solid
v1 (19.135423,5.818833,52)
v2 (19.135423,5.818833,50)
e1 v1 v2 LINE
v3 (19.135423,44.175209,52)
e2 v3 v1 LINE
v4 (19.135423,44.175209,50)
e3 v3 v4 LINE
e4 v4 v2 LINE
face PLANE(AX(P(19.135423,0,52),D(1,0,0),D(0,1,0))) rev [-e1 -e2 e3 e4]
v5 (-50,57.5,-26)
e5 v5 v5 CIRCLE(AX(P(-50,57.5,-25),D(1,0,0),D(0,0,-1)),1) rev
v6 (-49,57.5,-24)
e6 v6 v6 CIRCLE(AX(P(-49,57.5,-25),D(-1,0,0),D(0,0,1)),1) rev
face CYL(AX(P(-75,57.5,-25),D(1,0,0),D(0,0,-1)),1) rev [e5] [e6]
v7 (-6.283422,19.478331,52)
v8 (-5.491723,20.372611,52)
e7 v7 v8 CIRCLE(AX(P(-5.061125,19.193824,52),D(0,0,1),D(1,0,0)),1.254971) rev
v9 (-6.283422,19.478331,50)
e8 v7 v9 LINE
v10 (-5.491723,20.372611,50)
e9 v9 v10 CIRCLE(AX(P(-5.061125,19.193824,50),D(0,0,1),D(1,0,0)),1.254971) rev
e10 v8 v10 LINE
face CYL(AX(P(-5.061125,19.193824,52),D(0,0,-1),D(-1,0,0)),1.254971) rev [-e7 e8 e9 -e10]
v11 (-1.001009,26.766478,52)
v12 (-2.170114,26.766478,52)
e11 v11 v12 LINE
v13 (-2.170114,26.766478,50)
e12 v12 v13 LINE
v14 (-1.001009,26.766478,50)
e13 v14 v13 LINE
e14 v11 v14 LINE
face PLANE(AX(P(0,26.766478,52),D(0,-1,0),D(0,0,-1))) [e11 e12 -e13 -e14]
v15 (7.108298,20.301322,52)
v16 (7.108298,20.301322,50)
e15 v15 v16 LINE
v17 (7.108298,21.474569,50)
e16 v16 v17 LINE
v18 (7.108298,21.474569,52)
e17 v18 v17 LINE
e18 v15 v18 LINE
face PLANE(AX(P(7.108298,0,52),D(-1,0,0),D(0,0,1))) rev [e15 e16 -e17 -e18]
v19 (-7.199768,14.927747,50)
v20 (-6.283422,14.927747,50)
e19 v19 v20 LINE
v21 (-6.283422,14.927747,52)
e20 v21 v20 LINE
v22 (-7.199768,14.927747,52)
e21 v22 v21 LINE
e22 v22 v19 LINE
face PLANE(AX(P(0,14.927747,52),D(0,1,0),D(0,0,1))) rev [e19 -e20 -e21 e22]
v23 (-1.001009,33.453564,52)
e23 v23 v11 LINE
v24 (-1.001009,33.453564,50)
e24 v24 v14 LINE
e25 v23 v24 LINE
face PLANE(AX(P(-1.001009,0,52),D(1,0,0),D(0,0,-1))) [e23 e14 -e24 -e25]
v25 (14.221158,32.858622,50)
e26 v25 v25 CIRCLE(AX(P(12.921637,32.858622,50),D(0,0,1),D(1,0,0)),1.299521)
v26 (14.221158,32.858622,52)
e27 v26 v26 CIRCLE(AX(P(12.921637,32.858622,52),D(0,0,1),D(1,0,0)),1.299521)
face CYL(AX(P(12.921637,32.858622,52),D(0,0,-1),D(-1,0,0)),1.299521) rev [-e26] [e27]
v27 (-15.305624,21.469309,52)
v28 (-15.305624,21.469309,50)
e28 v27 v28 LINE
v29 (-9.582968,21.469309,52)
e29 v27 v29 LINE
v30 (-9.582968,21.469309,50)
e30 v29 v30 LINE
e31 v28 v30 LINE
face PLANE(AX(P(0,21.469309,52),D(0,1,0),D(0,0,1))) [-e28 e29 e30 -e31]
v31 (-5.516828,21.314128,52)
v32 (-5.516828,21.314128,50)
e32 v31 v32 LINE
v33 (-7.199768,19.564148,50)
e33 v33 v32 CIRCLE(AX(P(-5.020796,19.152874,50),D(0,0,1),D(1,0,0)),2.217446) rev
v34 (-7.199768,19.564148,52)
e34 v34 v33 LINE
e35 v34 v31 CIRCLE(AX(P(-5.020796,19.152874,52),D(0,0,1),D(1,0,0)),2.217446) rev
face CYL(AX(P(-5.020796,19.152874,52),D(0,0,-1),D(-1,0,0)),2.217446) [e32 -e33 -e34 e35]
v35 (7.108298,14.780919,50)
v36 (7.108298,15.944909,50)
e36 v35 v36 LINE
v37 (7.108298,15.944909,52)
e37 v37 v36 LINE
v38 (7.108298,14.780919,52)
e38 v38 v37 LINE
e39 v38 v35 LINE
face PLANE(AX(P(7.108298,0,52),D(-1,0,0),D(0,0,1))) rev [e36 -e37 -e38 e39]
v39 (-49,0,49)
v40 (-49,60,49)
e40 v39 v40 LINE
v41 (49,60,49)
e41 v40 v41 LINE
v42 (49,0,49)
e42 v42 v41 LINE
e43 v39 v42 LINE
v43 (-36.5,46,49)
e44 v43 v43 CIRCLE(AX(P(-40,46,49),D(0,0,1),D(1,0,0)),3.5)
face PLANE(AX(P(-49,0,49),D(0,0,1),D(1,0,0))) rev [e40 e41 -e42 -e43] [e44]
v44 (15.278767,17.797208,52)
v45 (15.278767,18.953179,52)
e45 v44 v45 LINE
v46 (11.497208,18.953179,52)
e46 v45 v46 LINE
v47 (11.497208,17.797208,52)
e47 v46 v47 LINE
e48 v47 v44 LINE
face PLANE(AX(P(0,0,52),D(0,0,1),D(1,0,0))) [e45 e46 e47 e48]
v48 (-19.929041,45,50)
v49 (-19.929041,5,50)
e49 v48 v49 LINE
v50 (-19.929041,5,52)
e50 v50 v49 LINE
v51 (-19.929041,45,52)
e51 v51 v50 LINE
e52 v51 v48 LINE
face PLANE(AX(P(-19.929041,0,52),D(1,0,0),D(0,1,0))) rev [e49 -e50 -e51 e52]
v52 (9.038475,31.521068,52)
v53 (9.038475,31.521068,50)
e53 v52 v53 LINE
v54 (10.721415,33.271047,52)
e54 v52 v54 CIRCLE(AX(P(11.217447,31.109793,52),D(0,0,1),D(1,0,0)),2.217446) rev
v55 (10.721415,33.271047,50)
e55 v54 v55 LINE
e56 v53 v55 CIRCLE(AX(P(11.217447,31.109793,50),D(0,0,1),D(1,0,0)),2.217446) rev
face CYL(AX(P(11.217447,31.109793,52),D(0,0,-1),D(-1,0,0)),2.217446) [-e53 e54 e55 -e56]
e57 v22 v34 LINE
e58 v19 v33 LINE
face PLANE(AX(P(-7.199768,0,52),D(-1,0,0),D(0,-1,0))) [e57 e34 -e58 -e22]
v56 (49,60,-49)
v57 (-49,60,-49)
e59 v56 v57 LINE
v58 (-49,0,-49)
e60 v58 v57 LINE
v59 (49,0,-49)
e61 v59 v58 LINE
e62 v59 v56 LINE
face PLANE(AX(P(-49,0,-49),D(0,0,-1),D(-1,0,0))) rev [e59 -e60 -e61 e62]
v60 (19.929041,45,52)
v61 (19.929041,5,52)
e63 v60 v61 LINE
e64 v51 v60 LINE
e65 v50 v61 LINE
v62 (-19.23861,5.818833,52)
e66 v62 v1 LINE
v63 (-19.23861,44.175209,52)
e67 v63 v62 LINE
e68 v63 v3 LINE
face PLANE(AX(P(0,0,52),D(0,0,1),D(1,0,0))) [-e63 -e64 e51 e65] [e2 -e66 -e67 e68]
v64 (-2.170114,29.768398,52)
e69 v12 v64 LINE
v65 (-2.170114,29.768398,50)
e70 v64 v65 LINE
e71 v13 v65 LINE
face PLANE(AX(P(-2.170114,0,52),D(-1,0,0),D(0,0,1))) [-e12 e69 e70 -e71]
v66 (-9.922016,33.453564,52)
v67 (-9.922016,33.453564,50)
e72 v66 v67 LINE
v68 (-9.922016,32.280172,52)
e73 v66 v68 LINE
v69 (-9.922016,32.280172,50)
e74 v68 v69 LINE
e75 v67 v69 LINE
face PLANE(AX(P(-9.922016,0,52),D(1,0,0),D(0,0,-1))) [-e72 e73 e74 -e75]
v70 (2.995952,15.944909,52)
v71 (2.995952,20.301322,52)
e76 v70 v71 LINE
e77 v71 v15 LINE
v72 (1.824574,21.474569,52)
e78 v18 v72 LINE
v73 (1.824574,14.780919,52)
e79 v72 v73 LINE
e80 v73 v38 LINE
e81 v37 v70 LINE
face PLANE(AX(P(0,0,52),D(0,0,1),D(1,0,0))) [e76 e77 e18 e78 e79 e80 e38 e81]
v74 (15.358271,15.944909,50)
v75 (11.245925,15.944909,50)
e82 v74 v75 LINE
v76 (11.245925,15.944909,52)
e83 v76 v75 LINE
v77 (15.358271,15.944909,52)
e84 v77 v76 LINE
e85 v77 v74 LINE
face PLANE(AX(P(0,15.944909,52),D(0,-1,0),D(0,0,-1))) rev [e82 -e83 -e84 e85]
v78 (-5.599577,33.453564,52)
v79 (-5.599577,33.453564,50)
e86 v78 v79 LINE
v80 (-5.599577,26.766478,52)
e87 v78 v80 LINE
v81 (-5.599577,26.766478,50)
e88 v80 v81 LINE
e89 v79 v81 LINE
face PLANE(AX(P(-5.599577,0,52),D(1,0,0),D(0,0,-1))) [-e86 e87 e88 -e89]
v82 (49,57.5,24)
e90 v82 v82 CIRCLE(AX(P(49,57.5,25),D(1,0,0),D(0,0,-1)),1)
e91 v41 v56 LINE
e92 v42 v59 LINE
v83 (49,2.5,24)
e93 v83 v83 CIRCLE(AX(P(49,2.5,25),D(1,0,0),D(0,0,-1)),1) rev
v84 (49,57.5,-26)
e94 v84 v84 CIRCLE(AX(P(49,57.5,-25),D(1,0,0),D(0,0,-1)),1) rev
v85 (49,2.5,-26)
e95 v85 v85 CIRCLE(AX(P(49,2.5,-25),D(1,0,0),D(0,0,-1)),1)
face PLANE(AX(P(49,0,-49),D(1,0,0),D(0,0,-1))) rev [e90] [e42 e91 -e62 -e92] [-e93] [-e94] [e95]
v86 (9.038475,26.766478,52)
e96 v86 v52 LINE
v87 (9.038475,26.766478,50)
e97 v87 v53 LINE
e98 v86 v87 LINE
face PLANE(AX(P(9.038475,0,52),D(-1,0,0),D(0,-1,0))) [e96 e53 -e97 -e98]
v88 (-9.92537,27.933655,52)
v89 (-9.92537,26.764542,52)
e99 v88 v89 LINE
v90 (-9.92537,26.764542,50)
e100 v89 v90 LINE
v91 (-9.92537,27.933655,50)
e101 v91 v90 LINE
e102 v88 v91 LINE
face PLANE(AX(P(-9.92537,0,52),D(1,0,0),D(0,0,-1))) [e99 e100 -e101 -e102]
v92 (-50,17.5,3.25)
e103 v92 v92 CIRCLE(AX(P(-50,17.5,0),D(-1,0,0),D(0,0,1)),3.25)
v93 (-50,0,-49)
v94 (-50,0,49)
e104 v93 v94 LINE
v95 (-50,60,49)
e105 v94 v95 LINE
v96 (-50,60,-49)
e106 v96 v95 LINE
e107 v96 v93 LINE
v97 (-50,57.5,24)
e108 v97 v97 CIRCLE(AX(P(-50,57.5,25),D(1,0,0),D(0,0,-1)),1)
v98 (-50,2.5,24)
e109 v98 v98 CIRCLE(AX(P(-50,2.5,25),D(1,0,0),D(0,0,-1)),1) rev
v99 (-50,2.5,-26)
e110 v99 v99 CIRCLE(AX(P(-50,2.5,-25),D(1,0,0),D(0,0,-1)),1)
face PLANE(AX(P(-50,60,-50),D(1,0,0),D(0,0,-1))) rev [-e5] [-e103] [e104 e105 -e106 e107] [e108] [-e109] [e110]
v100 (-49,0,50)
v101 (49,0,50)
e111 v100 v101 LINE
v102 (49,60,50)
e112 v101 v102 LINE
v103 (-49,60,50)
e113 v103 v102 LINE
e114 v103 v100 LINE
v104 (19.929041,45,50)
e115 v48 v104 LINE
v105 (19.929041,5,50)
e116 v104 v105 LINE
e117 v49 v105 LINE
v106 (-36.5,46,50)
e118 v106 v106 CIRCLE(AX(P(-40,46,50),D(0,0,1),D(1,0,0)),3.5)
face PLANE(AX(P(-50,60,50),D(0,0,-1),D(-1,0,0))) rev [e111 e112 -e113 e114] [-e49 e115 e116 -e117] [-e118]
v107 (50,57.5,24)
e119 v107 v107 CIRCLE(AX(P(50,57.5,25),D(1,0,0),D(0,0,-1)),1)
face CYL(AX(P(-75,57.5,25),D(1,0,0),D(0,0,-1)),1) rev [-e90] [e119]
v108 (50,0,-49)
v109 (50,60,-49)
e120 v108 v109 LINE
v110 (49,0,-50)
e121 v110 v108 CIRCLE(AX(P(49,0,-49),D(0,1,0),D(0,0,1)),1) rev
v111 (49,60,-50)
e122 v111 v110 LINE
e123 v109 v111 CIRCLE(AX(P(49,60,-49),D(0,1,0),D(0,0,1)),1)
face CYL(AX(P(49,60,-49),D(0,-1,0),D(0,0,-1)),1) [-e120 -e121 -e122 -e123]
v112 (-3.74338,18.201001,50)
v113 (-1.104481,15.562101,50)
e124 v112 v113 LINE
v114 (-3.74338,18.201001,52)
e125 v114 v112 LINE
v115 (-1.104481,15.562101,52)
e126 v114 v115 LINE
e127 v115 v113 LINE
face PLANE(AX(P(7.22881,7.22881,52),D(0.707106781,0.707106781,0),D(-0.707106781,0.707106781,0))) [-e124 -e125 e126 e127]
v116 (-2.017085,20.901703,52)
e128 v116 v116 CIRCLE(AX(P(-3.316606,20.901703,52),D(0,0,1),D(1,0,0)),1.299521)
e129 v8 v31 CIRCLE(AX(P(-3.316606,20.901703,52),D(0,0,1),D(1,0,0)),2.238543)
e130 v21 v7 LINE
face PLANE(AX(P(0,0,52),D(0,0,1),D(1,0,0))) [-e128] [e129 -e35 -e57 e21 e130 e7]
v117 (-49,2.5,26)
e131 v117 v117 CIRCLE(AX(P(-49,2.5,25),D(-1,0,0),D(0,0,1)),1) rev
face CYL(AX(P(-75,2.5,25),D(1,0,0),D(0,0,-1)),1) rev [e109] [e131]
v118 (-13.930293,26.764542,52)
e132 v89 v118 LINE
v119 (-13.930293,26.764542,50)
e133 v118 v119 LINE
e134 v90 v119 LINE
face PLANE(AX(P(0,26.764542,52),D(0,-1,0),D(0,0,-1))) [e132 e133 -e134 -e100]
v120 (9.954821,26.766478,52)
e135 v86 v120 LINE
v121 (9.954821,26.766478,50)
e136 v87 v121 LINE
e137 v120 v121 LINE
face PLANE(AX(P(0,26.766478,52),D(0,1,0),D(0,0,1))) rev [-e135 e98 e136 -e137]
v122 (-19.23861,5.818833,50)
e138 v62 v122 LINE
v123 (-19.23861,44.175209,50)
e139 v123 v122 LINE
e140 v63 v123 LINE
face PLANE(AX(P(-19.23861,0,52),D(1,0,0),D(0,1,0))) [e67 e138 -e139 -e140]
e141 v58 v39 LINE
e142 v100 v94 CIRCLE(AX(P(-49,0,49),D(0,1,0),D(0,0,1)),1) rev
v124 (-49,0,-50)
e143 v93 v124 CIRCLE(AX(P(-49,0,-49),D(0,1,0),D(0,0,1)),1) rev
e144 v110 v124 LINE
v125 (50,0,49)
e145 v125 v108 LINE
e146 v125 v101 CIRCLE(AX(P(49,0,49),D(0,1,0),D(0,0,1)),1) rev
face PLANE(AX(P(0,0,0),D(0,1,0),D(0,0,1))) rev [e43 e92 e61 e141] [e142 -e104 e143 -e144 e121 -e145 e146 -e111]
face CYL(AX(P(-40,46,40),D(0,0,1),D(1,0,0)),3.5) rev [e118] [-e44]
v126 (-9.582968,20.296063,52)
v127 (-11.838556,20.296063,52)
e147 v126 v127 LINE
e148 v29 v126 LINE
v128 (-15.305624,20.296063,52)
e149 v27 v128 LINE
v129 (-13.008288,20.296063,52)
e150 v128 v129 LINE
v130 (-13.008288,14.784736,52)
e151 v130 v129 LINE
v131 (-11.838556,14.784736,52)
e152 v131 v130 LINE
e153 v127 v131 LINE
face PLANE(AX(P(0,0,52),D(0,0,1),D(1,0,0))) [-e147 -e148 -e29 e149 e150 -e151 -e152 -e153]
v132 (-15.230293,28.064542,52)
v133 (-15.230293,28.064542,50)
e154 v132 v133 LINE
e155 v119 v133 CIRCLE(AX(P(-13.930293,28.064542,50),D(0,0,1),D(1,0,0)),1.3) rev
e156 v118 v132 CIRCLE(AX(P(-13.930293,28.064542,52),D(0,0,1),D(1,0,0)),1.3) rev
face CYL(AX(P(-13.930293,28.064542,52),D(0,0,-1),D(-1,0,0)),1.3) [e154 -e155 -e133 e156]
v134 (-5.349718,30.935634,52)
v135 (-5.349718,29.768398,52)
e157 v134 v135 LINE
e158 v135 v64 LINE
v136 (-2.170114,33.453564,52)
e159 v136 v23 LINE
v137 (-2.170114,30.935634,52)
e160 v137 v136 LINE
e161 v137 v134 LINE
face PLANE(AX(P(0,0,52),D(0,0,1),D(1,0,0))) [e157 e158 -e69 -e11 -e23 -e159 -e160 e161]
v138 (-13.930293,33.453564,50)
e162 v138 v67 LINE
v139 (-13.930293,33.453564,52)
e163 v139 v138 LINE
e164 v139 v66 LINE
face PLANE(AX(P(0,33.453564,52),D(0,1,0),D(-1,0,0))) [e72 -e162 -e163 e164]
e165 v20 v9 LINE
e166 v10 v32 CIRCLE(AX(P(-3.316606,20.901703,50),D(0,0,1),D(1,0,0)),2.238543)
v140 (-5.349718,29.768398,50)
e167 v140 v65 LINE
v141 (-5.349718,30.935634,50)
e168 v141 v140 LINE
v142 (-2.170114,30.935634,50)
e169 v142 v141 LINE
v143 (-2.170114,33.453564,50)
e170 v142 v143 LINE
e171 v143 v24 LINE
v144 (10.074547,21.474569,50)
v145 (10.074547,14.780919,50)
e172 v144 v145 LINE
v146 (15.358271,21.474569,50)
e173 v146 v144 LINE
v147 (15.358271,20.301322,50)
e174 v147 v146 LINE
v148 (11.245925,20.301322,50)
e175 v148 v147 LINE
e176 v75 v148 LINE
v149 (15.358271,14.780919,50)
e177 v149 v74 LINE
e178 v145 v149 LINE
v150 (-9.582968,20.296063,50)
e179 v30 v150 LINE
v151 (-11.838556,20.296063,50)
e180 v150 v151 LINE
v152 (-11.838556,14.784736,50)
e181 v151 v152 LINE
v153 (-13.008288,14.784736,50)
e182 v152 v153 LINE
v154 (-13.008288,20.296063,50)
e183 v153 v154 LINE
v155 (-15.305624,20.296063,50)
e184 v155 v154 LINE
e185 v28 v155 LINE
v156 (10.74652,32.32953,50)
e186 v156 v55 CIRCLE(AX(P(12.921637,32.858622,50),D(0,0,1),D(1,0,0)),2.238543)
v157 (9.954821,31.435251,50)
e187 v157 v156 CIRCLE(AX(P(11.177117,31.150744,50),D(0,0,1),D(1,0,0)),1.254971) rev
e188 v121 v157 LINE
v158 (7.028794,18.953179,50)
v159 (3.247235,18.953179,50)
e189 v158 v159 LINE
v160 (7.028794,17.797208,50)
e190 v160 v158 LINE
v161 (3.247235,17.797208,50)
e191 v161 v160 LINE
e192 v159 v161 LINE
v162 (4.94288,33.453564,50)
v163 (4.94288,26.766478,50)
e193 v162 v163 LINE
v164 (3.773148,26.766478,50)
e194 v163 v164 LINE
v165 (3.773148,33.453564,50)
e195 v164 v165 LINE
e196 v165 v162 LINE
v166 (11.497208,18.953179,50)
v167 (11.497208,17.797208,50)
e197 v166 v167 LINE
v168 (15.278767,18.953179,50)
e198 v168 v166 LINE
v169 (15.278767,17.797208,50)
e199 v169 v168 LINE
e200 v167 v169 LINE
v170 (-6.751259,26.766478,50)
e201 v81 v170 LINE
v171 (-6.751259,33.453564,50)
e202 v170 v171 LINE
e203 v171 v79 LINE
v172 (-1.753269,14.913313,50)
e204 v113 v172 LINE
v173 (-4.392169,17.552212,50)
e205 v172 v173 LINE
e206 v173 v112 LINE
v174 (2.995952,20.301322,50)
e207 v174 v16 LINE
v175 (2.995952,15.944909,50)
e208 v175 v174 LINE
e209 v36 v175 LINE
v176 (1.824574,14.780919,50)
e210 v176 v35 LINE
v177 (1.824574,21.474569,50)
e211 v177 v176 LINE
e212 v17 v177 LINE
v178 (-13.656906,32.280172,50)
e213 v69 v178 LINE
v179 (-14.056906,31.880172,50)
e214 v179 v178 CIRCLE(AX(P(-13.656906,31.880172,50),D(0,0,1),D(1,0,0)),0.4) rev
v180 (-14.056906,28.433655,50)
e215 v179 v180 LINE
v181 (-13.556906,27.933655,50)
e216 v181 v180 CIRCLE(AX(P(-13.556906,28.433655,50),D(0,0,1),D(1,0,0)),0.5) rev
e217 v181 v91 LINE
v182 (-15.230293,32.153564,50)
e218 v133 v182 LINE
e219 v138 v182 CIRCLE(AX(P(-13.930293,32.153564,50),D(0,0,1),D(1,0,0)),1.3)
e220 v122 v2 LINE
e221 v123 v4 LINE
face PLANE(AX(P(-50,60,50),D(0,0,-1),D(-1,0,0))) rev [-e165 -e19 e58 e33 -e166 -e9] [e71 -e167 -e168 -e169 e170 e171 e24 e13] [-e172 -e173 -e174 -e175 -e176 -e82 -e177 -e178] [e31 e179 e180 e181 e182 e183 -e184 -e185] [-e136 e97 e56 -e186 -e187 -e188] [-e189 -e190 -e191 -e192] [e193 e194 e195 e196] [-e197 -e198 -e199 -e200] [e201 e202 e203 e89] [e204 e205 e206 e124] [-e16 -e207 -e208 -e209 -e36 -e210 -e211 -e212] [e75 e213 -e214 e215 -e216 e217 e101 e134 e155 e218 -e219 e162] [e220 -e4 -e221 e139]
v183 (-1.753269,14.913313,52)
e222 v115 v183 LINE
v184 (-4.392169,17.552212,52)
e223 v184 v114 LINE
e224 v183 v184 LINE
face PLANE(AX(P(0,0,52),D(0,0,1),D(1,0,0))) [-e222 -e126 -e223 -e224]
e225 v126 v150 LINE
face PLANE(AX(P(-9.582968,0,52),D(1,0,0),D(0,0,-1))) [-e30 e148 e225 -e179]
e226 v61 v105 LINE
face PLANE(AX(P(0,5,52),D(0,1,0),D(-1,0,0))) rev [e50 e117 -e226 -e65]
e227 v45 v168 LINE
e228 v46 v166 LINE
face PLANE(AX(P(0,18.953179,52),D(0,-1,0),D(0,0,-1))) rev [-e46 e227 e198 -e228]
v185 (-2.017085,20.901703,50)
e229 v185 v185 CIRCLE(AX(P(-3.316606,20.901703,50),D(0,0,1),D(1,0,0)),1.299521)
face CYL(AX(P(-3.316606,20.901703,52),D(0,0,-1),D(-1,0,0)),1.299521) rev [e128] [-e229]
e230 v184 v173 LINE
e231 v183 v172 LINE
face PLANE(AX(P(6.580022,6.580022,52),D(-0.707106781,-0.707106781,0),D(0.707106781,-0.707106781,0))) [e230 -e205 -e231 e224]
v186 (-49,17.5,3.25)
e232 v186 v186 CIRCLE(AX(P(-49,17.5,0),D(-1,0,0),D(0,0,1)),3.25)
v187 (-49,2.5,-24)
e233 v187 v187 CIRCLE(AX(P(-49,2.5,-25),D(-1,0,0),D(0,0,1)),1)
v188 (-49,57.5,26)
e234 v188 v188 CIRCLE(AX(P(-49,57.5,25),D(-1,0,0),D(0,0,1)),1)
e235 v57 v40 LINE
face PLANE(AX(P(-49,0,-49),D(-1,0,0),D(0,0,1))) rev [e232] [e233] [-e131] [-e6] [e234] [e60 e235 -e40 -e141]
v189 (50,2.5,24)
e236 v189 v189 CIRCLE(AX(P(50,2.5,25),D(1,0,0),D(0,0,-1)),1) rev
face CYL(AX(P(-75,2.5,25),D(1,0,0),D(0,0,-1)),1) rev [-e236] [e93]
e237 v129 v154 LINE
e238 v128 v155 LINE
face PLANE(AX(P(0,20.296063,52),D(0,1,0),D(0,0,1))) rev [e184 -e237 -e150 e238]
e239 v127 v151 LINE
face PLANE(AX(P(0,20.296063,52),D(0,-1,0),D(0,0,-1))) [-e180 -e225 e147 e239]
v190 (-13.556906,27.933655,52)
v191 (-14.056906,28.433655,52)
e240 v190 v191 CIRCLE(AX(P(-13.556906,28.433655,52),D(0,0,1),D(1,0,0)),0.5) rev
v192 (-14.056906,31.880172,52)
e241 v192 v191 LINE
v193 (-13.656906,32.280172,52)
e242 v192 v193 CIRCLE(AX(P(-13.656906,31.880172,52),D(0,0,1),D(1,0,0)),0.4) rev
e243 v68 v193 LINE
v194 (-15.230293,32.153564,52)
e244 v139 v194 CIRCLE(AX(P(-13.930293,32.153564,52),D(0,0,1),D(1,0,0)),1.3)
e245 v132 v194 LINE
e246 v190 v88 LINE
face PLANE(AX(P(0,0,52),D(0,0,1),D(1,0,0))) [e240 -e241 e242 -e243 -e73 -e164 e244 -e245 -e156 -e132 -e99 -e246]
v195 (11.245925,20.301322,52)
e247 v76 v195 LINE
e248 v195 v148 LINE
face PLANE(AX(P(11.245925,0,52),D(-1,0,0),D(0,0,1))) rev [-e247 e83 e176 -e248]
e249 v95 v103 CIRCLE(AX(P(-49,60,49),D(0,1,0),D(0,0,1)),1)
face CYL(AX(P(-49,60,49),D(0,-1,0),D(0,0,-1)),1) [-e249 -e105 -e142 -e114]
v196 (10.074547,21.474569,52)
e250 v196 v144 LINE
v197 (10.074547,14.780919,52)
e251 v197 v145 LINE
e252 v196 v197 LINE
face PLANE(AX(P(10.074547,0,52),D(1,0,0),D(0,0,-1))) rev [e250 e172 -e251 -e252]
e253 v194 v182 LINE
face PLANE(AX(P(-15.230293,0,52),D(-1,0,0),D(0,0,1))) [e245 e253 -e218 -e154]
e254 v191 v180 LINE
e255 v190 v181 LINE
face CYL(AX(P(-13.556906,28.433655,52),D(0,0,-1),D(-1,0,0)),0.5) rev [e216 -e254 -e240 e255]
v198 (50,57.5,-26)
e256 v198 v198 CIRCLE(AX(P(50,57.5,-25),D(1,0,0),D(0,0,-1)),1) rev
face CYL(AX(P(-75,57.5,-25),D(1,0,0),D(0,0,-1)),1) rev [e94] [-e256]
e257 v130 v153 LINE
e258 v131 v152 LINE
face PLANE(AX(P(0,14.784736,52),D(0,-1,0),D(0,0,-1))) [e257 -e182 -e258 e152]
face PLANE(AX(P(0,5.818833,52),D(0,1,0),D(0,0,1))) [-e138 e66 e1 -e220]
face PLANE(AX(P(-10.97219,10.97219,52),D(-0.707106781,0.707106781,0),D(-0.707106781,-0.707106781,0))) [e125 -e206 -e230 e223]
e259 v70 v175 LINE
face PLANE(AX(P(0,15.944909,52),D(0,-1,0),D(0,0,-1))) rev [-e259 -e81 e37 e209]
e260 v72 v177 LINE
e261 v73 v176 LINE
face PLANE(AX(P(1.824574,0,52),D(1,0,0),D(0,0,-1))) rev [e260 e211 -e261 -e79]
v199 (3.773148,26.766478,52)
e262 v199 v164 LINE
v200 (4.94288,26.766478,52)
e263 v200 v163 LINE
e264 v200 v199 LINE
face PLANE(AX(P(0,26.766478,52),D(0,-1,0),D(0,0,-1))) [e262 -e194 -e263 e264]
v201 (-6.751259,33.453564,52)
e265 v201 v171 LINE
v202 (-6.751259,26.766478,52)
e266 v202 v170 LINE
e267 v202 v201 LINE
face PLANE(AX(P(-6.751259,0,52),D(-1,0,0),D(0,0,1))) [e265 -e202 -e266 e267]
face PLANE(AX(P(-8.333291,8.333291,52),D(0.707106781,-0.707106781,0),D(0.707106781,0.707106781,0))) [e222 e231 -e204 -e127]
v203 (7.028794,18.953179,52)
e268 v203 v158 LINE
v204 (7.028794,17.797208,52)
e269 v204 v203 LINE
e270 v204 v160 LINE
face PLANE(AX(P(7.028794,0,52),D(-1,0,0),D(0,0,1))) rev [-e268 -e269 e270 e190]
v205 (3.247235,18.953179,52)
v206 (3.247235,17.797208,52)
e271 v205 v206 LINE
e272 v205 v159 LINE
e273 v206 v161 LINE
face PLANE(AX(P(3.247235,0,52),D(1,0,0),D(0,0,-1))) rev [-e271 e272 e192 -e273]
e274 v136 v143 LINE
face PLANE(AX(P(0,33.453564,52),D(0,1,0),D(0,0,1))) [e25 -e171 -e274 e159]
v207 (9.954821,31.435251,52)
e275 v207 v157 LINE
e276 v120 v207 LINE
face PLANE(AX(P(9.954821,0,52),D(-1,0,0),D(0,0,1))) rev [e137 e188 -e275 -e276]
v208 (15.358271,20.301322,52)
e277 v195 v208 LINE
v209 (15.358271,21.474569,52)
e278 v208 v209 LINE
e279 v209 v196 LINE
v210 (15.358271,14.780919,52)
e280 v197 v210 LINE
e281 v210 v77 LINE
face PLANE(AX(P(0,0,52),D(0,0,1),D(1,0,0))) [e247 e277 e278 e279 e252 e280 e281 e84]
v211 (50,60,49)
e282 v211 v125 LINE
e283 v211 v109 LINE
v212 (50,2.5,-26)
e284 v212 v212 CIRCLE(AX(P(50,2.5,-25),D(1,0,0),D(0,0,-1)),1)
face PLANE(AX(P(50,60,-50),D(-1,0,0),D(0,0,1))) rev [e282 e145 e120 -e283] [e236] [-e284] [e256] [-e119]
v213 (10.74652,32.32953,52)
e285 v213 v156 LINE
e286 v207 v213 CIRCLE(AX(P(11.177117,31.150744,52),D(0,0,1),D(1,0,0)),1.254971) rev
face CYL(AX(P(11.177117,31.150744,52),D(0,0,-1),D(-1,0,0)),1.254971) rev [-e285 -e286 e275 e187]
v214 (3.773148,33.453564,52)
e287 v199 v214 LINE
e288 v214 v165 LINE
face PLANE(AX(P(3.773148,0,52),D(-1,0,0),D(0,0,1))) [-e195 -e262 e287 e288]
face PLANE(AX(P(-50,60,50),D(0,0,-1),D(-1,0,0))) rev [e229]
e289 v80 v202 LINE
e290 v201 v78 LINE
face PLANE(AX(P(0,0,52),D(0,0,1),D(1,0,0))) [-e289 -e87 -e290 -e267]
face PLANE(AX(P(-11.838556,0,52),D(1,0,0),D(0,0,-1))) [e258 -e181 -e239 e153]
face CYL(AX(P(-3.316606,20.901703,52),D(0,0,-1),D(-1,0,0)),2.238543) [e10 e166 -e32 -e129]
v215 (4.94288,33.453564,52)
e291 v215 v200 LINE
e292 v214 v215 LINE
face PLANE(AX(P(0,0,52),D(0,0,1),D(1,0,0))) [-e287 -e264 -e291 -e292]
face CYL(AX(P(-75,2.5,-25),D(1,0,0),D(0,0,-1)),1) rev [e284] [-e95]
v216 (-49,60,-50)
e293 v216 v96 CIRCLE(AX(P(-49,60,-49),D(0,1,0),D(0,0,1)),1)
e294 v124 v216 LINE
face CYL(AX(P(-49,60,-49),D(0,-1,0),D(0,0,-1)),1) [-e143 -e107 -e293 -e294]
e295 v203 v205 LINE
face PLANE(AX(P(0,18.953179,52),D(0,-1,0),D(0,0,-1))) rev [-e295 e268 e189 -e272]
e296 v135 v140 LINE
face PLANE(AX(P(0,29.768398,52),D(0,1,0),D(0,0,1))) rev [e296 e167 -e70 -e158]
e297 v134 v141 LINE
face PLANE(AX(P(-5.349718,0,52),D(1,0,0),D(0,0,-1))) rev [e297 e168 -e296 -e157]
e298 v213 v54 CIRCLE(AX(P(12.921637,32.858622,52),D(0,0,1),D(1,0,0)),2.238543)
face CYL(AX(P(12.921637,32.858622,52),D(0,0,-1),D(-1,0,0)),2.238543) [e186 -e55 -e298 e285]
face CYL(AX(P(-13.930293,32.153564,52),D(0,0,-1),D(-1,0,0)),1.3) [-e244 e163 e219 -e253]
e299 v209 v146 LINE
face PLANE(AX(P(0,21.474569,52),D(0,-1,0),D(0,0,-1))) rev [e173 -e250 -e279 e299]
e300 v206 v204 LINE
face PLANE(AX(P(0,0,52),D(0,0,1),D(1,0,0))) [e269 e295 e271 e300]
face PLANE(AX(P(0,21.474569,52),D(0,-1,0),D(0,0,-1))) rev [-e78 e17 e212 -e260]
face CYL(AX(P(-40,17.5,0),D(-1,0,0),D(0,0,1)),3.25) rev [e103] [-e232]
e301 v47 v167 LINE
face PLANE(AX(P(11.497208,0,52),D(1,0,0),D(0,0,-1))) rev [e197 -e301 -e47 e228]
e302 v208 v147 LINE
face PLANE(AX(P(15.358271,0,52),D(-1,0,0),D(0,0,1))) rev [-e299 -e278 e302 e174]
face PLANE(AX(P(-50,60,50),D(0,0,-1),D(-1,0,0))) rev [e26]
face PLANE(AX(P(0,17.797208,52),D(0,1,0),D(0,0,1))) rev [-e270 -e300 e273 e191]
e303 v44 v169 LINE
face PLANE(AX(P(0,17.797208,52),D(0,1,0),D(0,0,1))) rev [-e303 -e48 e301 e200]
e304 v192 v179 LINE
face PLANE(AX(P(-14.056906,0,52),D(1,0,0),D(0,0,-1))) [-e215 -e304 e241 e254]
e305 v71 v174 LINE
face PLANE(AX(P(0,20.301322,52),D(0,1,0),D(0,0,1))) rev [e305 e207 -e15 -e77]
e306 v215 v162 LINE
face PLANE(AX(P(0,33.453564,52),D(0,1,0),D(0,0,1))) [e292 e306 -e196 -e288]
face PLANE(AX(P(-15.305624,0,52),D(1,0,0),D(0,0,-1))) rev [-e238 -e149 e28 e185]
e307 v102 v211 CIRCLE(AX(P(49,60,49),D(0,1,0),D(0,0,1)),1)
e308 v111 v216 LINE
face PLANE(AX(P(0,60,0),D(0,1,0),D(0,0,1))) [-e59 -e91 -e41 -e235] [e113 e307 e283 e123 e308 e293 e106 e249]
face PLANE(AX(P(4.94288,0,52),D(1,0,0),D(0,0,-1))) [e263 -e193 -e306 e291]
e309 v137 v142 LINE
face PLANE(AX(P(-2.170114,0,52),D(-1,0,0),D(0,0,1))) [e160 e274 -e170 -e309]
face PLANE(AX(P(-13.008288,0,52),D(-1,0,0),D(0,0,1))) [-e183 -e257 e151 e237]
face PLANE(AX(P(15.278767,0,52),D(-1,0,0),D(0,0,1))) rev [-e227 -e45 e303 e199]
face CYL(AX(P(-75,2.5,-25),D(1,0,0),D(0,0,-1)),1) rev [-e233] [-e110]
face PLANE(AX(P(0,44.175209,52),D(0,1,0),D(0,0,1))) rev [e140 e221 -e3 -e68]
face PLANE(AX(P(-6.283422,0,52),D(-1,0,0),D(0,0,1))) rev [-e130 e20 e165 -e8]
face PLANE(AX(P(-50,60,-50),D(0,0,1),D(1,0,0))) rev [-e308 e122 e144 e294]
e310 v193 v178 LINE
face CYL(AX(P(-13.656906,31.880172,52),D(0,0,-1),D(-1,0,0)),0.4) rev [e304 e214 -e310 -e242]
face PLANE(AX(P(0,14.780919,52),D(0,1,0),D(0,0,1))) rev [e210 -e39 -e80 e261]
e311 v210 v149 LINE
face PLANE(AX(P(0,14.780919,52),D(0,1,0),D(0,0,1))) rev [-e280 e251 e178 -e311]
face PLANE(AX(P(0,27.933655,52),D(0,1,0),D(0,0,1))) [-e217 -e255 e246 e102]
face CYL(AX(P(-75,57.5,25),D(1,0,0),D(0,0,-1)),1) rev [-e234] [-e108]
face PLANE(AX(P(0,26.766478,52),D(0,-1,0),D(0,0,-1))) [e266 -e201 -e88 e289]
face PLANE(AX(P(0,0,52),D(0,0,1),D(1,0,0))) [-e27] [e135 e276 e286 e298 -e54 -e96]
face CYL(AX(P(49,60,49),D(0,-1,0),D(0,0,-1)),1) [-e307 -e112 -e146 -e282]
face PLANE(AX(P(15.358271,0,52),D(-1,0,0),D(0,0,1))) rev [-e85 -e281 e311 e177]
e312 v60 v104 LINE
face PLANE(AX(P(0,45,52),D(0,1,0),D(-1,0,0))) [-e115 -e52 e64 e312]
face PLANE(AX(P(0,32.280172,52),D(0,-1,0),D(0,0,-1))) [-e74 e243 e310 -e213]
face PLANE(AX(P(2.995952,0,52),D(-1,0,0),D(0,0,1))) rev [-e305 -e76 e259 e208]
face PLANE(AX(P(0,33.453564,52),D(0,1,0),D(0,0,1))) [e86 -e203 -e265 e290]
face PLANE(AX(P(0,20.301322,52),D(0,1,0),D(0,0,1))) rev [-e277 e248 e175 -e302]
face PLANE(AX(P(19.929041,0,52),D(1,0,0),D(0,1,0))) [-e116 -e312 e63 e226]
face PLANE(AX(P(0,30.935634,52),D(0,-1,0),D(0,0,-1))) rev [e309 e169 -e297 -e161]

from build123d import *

# Parameters (mm, degrees)
SKETCH1_W                 = 100
SKETCH1_H                 = 100
BOSS_EXTRUDE1_DEPTH       = 60
SKETCH2_W                 = 98
SKETCH2_H                 = 98
CUT_EXTRUDE1_DEPTH        = 60
SKETCH3_R                 = 1
CUT_EXTRUDE2_DEPTH        = 125
CUT_EXTRUDE3_DEPTH        = 10
BOSS_EXTRUDE4_START       = 50
BOSS_EXTRUDE4_OUTLINE_W   = 39.858082606
BOSS_EXTRUDE4_OUTLINE_H   = 40
BOSS_EXTRUDE4_OUTLINE_W_2 = 38.374033315
BOSS_EXTRUDE4_OUTLINE_H_2 = 38.356376399
BOSS_EXTRUDE4_OUTLINE_W_3 = 1.151682465
BOSS_EXTRUDE4_OUTLINE_H_3 = 6.68708673
BOSS_EXTRUDE4_OUTLINE_W_4 = 1.169732075
BOSS_EXTRUDE4_OUTLINE_R   = 1.29952059
BOSS_EXTRUDE4_OUTLINE_W_5 = 3.781559684
BOSS_EXTRUDE4_OUTLINE_H_4 = 1.155970525
BOSS_EXTRUDE4_OUTLINE_W_6 = 3.781559683
BOSS_EXTRUDE4_DEPTH       = 2
SKETCH9_R                 = 3.5
CUT_EXTRUDE4_DEPTH        = 10
FILLET1_R                 = 1


# Read off the part's stored shape, not the designer's step: Boss-Extrude4
with BuildPart() as part:
    # Sketch1 → Boss-Extrude1 (new body)
    with BuildSketch(Plane(origin=(0, 0, 0), x_dir=(1, 0, 0), z_dir=(0, 1, 0))):
        Rectangle(SKETCH1_W, SKETCH1_H)
    extrude(amount=BOSS_EXTRUDE1_DEPTH)

    # Sketch2 → Cut-Extrude1 (cut)
    with BuildSketch(Plane(origin=(0, 60, 0), x_dir=(1, 0, 0), z_dir=(0, 1, 0))):
        Rectangle(SKETCH2_W, SKETCH2_H)
    extrude(amount=-CUT_EXTRUDE1_DEPTH, mode=Mode.SUBTRACT)

    # Sketch3 → Cut-Extrude2 (cut)
    with BuildSketch(Plane(origin=(50, 0, 0), x_dir=(0, 0, -1), z_dir=(1, 0, 0))):
        with BuildLine():
            ThreePointArc((-24, 57.5), (-25, 58.5), (-26, 57.5))
            Line((-26, 57.5), (-24, 57.5))
        make_face()
        with BuildLine():
            Line((-24, 57.5), (-26, 57.5))
            ThreePointArc((-26, 57.5), (-25, 56.5), (-24, 57.5))
        make_face()
        with Locations((25, 57.5)):
            Circle(SKETCH3_R)
        with Locations((-25, 2.5)):
            Circle(SKETCH3_R)
        with Locations((25, 2.5)):
            Circle(SKETCH3_R)
    extrude(amount=-CUT_EXTRUDE2_DEPTH, mode=Mode.SUBTRACT)

    # Sketch5 → Cut-Extrude3 (cut)
    with BuildSketch(Plane.ZY.offset(50)):
        with BuildLine():
            ThreePointArc((3.25, 17.5), (2.298097039, 19.798097039), (0, 20.75))
            Line((0, 20.75), (0, 14.25))
            ThreePointArc((0, 14.25), (2.298097039, 15.201902961), (3.25, 17.5))
        make_face()
        with BuildLine():
            Line((0, 14.25), (0, 20.75))
            ThreePointArc((0, 20.75), (-3.25, 17.5), (0, 14.25))
        make_face()
    extrude(amount=-CUT_EXTRUDE3_DEPTH, mode=Mode.SUBTRACT)

    # Boss-Extrude4 outline → Boss-Extrude4 (add)
    # profile 1 of 13: a face of its own
    with BuildSketch(Plane.XY.offset(BOSS_EXTRUDE4_START)):
        with Locations((0, 25)):
            Rectangle(BOSS_EXTRUDE4_OUTLINE_W, BOSS_EXTRUDE4_OUTLINE_H)
        with Locations((-0.051593215, 24.997020999)):
            Rectangle(BOSS_EXTRUDE4_OUTLINE_W_2, BOSS_EXTRUDE4_OUTLINE_H_2, mode=Mode.SUBTRACT)
    # profile 2 of 13: a face of its own
    with BuildSketch(Plane.XY.offset(BOSS_EXTRUDE4_START)):
        with BuildLine():
            Line((-9.922016309, 32.280172221), (-9.922016309, 33.453564236))
            Line((-9.922016309, 33.453564236), (-13.93029333, 33.453564236))
            ThreePointArc((-13.93029333, 33.453564236), (-14.849532145, 33.072803052), (-15.23029333, 32.153564236))
            Line((-15.23029333, 32.153564236), (-15.23029333, 28.064542243))
            ThreePointArc((-15.23029333, 28.064542243), (-14.849532146, 27.145303428), (-13.93029333, 26.764542243))
            Line((-13.93029333, 26.764542243), (-9.925370196, 26.764542243))
            Line((-9.925370196, 26.764542243), (-9.925370196, 27.933655334))
            Line((-9.925370196, 27.933655334), (-13.55690574, 27.933655334))
            ThreePointArc((-13.55690574, 27.933655334), (-13.910459131, 28.080101943), (-14.05690574, 28.433655334))
            Line((-14.05690574, 28.433655334), (-14.05690574, 31.880172221))
            ThreePointArc((-14.05690574, 31.880172221), (-13.939748452, 32.163014933), (-13.65690574, 32.280172221))
            Line((-13.65690574, 32.280172221), (-9.922016309, 32.280172221))
        make_face()
    # profile 3 of 13: a face of its own
    with BuildSketch(Plane.XY.offset(BOSS_EXTRUDE4_START)):
        with Locations((-6.175417948, 30.110020871)):
            Rectangle(BOSS_EXTRUDE4_OUTLINE_W_3, BOSS_EXTRUDE4_OUTLINE_H_3)
    # profile 4 of 13: a face of its own
    with BuildSketch(Plane.XY.offset(BOSS_EXTRUDE4_START)):
        Polygon((-1.00100917, 26.766477506), (-1.00100917, 33.453564236), (-2.170113717, 33.453564236), (-2.170113717, 30.935634342), (-5.349717596, 30.935634342), (-5.349717596, 29.768397912), (-2.170113717, 29.768397912), (-2.170113717, 26.766477506), align=None)
    # profile 5 of 13: a face of its own
    with BuildSketch(Plane.XY.offset(BOSS_EXTRUDE4_START)):
        with Locations((4.358014237, 30.110020871)):
            Rectangle(BOSS_EXTRUDE4_OUTLINE_W_4, BOSS_EXTRUDE4_OUTLINE_H_3)
    # profile 6 of 13: a face of its own
    with BuildSketch(Plane.XY.offset(BOSS_EXTRUDE4_START)):
        with BuildLine():
            Line((9.038474855, 26.766477506), (9.954821181, 26.766477506))
            Line((9.954821181, 26.766477506), (9.954821181, 31.435250737))
            ThreePointArc((9.954821181, 31.435250737), (10.237464032, 31.982611448), (10.746519943, 32.329530473))
            ThreePointArc((10.746519943, 32.329530473), (15.159384473, 32.918290446), (10.721414833, 33.271046936))
            ThreePointArc((10.721414833, 33.271046936), (9.619160753, 32.646851071), (9.038474855, 31.521067599))
            Line((9.038474855, 31.521067599), (9.038474855, 26.766477506))
        make_face()
        with Locations((12.921637239, 32.858621929)):
            Circle(BOSS_EXTRUDE4_OUTLINE_R, mode=Mode.SUBTRACT)
    # profile 7 of 13: a face of its own
    with BuildSketch(Plane.XY.offset(BOSS_EXTRUDE4_START)):
        Polygon((15.358270934, 20.30132248), (15.358270934, 21.474568974), (10.074546624, 21.474568974), (10.074546624, 14.78091915), (15.358270934, 14.78091915), (15.358270934, 15.94490899), (11.24592521, 15.94490899), (11.24592521, 20.30132248), align=None)
    # profile 8 of 13: a face of its own
    with BuildSketch(Plane.XY.offset(BOSS_EXTRUDE4_START)):
        Polygon((7.108297958, 21.474568974), (1.824573649, 21.474568974), (1.824573649, 14.78091915), (7.108297958, 14.78091915), (7.108297958, 15.94490899), (2.995952235, 15.94490899), (2.995952235, 20.30132248), (7.108297958, 20.30132248), align=None)
    # profile 9 of 13: a face of its own
    with BuildSketch(Plane.XY.offset(BOSS_EXTRUDE4_START)):
        with Locations((13.387987428, 18.375193575)):
            Rectangle(BOSS_EXTRUDE4_OUTLINE_W_5, BOSS_EXTRUDE4_OUTLINE_H_4)
    # profile 10 of 13: a face of its own
    with BuildSketch(Plane.XY.offset(BOSS_EXTRUDE4_START)):
        with Locations((5.138014453, 18.375193575)):
            Rectangle(BOSS_EXTRUDE4_OUTLINE_W_6, BOSS_EXTRUDE4_OUTLINE_H_4)
    # profile 11 of 13: a face of its own
    with BuildSketch(Plane.XY.offset(BOSS_EXTRUDE4_START)):
        with BuildLine():
            Line((-6.283421644, 14.927747144), (-6.283421644, 19.478331399))
            ThreePointArc((-6.283421644, 19.478331399), (-6.000778792, 20.025692111), (-5.491722882, 20.372611136))
            ThreePointArc((-5.491722882, 20.372611136), (-1.078858352, 20.961371104), (-5.516827991, 21.314127598))
            ThreePointArc((-5.516827991, 21.314127598), (-6.619082072, 20.689931733), (-7.19976797, 19.564148262))
            Line((-7.19976797, 19.564148262), (-7.19976797, 14.927747144))
            Line((-7.19976797, 14.927747144), (-6.283421644, 14.927747144))
        make_face()
        with Locations((-3.316605586, 20.901702592)):
            Circle(BOSS_EXTRUDE4_OUTLINE_R, mode=Mode.SUBTRACT)
    # profile 12 of 13: a face of its own
    with BuildSketch(Plane.XY.offset(BOSS_EXTRUDE4_START)):
        Polygon((-3.743380156, 18.2010008), (-4.392168827, 17.55221213), (-1.75326942, 14.913312723), (-1.104480749, 15.562101393), align=None)
    # profile 13 of 13: a face of its own
    with BuildSketch(Plane.XY.offset(BOSS_EXTRUDE4_START)):
        Polygon((-15.305624402, 21.469309136), (-15.305624402, 20.296062642), (-13.00828814, 20.296062642), (-13.00828814, 14.784735536), (-11.838556065, 14.784735536), (-11.838556065, 20.296062642), (-9.582967691, 20.296062642), (-9.582967691, 21.469309136), align=None)
    extrude(amount=BOSS_EXTRUDE4_DEPTH)

    # Sketch9 → Cut-Extrude4 (cut)
    with BuildSketch(Plane.XY.offset(50)):
        with Locations((-40, 46)):
            Circle(SKETCH9_R)
    extrude(amount=-CUT_EXTRUDE4_DEPTH, mode=Mode.SUBTRACT)

    # Fillet1
    fillet1_edges = [part.edges().sort_by_distance(p)[0] for p in [
        (50, 30, 50),
        (-50, 30, 50),
        (-50, 30, -50),
        (50, 30, -50),
    ]]
    fillet(fillet1_edges, radius=FILLET1_R)


solid = part.part
